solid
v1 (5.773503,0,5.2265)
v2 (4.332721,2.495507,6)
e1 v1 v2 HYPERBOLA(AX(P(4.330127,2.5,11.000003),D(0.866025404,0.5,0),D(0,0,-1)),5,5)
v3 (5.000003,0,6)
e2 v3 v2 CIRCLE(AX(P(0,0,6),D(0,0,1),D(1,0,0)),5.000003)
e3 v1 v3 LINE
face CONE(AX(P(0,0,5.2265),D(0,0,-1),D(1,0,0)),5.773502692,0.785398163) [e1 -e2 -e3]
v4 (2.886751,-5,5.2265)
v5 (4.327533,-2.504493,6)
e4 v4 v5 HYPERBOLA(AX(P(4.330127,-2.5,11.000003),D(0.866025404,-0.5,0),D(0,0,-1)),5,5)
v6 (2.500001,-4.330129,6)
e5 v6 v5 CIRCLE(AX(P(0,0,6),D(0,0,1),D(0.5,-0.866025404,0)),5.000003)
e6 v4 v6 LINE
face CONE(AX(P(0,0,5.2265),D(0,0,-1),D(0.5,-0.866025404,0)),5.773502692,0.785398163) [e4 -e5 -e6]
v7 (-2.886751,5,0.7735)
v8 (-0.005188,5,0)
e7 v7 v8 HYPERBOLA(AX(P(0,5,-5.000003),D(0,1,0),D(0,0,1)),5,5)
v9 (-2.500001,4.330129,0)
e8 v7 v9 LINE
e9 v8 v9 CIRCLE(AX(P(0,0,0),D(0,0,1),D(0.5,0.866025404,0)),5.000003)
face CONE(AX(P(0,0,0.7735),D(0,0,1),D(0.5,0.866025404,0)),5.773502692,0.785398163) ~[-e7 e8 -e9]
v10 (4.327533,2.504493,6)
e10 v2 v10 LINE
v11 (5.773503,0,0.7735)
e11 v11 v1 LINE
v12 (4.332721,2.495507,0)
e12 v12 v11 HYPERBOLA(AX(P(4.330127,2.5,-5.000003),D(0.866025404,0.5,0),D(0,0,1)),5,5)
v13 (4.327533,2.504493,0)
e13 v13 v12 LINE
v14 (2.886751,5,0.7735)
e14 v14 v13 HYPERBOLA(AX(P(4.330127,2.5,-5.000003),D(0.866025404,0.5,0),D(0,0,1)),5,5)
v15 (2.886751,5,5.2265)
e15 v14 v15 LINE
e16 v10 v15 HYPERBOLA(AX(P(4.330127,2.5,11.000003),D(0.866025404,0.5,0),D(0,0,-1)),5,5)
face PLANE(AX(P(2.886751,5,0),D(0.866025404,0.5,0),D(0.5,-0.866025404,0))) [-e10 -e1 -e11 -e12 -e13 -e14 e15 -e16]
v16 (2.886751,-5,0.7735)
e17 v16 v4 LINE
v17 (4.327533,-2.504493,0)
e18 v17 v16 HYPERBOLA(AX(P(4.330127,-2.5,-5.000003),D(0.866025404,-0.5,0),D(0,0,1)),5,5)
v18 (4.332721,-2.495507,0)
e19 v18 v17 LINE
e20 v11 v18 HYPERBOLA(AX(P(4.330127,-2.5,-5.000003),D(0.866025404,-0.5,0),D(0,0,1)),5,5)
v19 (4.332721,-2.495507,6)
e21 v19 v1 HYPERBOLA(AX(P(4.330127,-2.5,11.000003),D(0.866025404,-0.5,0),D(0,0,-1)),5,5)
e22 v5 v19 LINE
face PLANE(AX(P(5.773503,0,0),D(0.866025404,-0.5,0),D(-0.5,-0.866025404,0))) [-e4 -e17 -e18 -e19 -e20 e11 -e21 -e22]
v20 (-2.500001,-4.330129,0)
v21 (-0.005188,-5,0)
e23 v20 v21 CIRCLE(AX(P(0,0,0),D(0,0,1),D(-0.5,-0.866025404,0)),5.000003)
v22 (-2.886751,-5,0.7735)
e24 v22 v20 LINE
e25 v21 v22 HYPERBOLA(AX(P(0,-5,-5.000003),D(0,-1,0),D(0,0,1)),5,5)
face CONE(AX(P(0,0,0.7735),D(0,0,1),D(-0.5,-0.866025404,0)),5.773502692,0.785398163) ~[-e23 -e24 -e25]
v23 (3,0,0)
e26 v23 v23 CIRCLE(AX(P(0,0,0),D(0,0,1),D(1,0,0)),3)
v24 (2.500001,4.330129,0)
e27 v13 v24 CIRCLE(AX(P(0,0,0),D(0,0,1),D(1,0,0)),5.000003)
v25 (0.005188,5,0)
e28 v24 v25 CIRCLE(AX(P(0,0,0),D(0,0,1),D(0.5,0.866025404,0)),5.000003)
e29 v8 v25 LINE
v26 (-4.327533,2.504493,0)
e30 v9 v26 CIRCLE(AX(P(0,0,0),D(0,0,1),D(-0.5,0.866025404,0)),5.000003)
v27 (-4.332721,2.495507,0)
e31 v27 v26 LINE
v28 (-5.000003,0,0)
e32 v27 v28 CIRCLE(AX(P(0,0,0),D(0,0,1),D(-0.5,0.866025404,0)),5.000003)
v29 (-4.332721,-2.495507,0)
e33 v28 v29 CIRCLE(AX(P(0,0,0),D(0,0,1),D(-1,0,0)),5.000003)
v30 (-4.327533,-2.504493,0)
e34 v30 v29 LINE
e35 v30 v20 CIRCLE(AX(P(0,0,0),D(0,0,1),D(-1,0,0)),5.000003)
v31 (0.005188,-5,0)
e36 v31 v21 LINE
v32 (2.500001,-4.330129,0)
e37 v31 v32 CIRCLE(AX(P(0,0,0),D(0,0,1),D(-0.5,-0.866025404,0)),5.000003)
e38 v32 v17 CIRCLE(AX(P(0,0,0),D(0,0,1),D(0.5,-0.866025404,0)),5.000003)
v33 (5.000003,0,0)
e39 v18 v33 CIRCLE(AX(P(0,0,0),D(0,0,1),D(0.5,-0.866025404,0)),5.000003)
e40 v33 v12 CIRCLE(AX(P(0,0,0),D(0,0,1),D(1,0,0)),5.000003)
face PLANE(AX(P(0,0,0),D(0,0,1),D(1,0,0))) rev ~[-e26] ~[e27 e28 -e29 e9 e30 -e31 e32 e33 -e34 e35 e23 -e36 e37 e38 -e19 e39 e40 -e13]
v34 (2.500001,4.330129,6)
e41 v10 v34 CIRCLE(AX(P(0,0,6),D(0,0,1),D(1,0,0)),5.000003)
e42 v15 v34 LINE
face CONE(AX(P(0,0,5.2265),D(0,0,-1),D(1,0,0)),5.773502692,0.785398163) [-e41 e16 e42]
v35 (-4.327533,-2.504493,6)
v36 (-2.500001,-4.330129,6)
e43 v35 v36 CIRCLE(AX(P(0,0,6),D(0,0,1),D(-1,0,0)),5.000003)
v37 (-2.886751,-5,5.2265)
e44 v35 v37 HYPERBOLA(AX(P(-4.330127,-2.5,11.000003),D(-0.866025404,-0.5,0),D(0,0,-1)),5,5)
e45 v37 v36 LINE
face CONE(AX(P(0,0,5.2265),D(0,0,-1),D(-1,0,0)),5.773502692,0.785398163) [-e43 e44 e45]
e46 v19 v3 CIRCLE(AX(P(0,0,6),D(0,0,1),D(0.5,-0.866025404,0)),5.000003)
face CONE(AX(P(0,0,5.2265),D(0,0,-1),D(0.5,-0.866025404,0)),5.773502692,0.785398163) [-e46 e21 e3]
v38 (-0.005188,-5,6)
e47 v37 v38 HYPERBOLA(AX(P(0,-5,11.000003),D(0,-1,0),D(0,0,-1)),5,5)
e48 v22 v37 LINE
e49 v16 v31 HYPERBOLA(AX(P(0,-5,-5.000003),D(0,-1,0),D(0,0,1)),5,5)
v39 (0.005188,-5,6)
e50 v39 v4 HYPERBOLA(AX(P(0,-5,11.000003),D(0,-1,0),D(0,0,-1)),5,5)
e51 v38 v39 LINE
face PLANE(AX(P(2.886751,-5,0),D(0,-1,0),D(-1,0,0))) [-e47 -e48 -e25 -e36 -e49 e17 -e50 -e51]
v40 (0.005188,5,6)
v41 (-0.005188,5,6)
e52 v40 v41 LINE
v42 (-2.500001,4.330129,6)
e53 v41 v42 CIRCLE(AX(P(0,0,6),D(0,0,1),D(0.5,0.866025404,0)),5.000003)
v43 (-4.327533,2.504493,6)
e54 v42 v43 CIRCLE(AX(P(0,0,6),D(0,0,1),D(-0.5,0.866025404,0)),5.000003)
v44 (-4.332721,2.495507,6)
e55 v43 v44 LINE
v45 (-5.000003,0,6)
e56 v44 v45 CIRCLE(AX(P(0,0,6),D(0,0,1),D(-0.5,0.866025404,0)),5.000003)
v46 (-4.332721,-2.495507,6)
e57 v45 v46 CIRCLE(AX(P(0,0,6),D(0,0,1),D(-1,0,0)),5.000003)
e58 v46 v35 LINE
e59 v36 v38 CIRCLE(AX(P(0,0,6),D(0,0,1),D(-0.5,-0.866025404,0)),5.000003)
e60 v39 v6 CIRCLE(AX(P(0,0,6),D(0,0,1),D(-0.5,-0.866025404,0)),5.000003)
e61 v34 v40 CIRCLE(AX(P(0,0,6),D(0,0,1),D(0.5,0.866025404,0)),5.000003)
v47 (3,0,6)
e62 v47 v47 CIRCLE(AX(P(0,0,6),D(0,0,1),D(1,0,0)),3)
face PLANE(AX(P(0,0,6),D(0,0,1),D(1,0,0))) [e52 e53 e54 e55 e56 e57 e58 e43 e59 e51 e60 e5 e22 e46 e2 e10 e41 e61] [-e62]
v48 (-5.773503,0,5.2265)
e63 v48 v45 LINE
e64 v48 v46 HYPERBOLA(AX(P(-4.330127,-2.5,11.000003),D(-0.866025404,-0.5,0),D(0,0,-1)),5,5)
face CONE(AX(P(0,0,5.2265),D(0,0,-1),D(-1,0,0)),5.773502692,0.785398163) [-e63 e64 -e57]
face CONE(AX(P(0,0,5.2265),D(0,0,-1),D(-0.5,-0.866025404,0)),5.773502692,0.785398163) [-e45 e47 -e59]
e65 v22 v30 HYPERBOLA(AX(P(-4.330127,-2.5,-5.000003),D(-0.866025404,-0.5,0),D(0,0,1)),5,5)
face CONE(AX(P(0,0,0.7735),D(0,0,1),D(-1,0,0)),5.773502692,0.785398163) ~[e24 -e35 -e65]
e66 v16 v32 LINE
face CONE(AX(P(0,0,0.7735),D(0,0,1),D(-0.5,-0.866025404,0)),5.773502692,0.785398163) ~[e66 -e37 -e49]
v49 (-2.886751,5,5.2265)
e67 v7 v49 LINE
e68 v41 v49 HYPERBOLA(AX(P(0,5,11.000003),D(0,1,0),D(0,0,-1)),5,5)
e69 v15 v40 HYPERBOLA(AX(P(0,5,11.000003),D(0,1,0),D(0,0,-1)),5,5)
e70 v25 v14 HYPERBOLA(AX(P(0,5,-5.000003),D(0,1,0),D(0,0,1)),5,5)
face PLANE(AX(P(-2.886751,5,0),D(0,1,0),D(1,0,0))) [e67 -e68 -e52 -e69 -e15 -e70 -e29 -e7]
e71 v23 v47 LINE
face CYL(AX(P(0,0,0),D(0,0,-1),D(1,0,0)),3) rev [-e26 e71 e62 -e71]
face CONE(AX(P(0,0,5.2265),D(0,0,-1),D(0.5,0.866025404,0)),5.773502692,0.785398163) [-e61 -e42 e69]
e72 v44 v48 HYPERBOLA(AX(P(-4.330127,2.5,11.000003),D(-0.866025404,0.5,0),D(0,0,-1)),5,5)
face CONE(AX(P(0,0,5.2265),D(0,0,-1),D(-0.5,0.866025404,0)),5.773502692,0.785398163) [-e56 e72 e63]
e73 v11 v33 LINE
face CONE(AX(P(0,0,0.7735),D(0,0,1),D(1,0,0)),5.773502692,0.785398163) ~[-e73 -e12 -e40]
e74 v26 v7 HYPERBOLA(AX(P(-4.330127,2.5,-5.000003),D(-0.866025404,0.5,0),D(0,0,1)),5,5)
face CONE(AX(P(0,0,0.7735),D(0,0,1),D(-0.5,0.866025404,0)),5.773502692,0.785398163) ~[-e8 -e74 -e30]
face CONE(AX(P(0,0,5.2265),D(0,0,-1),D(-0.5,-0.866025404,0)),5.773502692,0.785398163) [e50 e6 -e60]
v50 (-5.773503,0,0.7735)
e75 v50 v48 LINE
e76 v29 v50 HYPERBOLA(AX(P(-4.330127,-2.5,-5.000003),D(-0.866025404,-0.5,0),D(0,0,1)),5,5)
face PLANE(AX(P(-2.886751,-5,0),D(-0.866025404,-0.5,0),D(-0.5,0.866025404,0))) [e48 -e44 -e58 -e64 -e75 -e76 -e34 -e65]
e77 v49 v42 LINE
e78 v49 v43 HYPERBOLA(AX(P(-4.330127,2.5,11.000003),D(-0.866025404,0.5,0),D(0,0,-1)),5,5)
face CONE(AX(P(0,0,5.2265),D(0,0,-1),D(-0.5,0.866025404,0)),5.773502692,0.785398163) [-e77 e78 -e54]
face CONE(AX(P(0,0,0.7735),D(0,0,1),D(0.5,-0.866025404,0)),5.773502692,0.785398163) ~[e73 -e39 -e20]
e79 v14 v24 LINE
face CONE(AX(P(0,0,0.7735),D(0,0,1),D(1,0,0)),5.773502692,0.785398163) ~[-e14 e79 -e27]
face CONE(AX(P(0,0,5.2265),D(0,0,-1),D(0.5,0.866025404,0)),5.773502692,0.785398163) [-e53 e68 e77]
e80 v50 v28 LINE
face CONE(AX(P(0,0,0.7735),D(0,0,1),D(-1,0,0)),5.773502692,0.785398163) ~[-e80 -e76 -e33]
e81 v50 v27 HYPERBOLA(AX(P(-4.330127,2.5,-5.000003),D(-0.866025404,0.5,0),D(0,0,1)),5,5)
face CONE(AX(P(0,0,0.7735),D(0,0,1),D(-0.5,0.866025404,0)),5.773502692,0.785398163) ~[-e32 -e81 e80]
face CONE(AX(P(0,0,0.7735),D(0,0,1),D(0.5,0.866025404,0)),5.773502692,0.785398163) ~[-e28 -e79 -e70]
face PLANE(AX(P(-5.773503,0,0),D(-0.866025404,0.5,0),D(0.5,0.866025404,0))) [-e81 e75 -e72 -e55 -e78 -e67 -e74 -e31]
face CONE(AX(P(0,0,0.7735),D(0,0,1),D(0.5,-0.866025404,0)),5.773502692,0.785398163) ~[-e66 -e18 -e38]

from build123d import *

# Parameters (mm, degrees)
F0_R     = 3
F1_DEPTH = 6
F2_SIZE  = 0.7735
F3_DEPTH = 6.001


# Not quite as in the source:
# - a feature names something its author has since deleted; it is built from what else it names


with BuildPart() as f1:
    # F0 (on Top) → F1 (new body)
    with BuildSketch(Plane.XY):
        Polygon((2.8867513459, 5), (-2.8867513459, 5), (-5.7735026919, 0), (-2.8867513459, -5), (2.8867513459, -5), (5.7735026919, 0), align=None)
        Circle(F0_R, mode=Mode.SUBTRACT)
        with BuildLine():
            Line((-5.7735026919, 0), (-2.8867513459, 5))
            ThreePointArc((-2.8867513459, 5), (-5, 2.8867513459), (-5.7735026919, 0))
        make_face()
        with BuildLine():
            Line((-2.8867513459, -5), (-5.7735026919, 0))
            ThreePointArc((-5.7735026919, 0), (-5, -2.8867513459), (-2.8867513459, -5))
        make_face()
        with BuildLine():
            ThreePointArc((2.8867513459, -5), (5, -2.8867513459), (5.7735026919, 0))
            Line((5.7735026919, 0), (2.8867513459, -5))
        make_face()
        with BuildLine():
            ThreePointArc((5.7735026919, 0), (5, 2.8867513459), (2.8867513459, 5))
            Line((2.8867513459, 5), (5.7735026919, 0))
        make_face()
        with BuildLine():
            ThreePointArc((2.8867513459, 5), (0, 5.7735026919), (-2.8867513459, 5))
            Line((-2.8867513459, 5), (2.8867513459, 5))
        make_face()
        with BuildLine():
            Line((2.8867513459, -5), (-2.8867513459, -5))
            ThreePointArc((-2.8867513459, -5), (0, -5.7735026919), (2.8867513459, -5))
        make_face()
    extrude(amount=F1_DEPTH)

    # F2
    f2_edges = [f1.edges().sort_by_distance(p)[0] for p in [
        (2.886751, 5, 6),
        (2.886751, 5, 0),
    ]]
    chamfer(f2_edges, length=F2_SIZE)

    # F0 (on Top) → F3 (cut, through all)
    with BuildSketch(Plane.XY):
        with BuildLine():
            Line((-2.8867513459, -5), (-5.7735026919, 0))
            ThreePointArc((-5.7735026919, 0), (-5, -2.8867513459), (-2.8867513459, -5))
        make_face()
        with BuildLine():
            Line((-5.7735026919, 0), (-2.8867513459, 5))
            ThreePointArc((-2.8867513459, 5), (-5, 2.8867513459), (-5.7735026919, 0))
        make_face()
        with BuildLine():
            ThreePointArc((2.8867513459, 5), (0, 5.7735026919), (-2.8867513459, 5))
            Line((-2.8867513459, 5), (2.8867513459, 5))
        make_face()
        with BuildLine():
            ThreePointArc((5.7735026919, 0), (5, 2.8867513459), (2.8867513459, 5))
            Line((2.8867513459, 5), (5.7735026919, 0))
        make_face()
        with BuildLine():
            ThreePointArc((2.8867513459, -5), (5, -2.8867513459), (5.7735026919, 0))
            Line((5.7735026919, 0), (2.8867513459, -5))
        make_face()
        with BuildLine():
            Line((2.8867513459, -5), (-2.8867513459, -5))
            ThreePointArc((-2.8867513459, -5), (0, -5.7735026919), (2.8867513459, -5))
        make_face()
    extrude(amount=F3_DEPTH, mode=Mode.SUBTRACT)


solid = f1.part
